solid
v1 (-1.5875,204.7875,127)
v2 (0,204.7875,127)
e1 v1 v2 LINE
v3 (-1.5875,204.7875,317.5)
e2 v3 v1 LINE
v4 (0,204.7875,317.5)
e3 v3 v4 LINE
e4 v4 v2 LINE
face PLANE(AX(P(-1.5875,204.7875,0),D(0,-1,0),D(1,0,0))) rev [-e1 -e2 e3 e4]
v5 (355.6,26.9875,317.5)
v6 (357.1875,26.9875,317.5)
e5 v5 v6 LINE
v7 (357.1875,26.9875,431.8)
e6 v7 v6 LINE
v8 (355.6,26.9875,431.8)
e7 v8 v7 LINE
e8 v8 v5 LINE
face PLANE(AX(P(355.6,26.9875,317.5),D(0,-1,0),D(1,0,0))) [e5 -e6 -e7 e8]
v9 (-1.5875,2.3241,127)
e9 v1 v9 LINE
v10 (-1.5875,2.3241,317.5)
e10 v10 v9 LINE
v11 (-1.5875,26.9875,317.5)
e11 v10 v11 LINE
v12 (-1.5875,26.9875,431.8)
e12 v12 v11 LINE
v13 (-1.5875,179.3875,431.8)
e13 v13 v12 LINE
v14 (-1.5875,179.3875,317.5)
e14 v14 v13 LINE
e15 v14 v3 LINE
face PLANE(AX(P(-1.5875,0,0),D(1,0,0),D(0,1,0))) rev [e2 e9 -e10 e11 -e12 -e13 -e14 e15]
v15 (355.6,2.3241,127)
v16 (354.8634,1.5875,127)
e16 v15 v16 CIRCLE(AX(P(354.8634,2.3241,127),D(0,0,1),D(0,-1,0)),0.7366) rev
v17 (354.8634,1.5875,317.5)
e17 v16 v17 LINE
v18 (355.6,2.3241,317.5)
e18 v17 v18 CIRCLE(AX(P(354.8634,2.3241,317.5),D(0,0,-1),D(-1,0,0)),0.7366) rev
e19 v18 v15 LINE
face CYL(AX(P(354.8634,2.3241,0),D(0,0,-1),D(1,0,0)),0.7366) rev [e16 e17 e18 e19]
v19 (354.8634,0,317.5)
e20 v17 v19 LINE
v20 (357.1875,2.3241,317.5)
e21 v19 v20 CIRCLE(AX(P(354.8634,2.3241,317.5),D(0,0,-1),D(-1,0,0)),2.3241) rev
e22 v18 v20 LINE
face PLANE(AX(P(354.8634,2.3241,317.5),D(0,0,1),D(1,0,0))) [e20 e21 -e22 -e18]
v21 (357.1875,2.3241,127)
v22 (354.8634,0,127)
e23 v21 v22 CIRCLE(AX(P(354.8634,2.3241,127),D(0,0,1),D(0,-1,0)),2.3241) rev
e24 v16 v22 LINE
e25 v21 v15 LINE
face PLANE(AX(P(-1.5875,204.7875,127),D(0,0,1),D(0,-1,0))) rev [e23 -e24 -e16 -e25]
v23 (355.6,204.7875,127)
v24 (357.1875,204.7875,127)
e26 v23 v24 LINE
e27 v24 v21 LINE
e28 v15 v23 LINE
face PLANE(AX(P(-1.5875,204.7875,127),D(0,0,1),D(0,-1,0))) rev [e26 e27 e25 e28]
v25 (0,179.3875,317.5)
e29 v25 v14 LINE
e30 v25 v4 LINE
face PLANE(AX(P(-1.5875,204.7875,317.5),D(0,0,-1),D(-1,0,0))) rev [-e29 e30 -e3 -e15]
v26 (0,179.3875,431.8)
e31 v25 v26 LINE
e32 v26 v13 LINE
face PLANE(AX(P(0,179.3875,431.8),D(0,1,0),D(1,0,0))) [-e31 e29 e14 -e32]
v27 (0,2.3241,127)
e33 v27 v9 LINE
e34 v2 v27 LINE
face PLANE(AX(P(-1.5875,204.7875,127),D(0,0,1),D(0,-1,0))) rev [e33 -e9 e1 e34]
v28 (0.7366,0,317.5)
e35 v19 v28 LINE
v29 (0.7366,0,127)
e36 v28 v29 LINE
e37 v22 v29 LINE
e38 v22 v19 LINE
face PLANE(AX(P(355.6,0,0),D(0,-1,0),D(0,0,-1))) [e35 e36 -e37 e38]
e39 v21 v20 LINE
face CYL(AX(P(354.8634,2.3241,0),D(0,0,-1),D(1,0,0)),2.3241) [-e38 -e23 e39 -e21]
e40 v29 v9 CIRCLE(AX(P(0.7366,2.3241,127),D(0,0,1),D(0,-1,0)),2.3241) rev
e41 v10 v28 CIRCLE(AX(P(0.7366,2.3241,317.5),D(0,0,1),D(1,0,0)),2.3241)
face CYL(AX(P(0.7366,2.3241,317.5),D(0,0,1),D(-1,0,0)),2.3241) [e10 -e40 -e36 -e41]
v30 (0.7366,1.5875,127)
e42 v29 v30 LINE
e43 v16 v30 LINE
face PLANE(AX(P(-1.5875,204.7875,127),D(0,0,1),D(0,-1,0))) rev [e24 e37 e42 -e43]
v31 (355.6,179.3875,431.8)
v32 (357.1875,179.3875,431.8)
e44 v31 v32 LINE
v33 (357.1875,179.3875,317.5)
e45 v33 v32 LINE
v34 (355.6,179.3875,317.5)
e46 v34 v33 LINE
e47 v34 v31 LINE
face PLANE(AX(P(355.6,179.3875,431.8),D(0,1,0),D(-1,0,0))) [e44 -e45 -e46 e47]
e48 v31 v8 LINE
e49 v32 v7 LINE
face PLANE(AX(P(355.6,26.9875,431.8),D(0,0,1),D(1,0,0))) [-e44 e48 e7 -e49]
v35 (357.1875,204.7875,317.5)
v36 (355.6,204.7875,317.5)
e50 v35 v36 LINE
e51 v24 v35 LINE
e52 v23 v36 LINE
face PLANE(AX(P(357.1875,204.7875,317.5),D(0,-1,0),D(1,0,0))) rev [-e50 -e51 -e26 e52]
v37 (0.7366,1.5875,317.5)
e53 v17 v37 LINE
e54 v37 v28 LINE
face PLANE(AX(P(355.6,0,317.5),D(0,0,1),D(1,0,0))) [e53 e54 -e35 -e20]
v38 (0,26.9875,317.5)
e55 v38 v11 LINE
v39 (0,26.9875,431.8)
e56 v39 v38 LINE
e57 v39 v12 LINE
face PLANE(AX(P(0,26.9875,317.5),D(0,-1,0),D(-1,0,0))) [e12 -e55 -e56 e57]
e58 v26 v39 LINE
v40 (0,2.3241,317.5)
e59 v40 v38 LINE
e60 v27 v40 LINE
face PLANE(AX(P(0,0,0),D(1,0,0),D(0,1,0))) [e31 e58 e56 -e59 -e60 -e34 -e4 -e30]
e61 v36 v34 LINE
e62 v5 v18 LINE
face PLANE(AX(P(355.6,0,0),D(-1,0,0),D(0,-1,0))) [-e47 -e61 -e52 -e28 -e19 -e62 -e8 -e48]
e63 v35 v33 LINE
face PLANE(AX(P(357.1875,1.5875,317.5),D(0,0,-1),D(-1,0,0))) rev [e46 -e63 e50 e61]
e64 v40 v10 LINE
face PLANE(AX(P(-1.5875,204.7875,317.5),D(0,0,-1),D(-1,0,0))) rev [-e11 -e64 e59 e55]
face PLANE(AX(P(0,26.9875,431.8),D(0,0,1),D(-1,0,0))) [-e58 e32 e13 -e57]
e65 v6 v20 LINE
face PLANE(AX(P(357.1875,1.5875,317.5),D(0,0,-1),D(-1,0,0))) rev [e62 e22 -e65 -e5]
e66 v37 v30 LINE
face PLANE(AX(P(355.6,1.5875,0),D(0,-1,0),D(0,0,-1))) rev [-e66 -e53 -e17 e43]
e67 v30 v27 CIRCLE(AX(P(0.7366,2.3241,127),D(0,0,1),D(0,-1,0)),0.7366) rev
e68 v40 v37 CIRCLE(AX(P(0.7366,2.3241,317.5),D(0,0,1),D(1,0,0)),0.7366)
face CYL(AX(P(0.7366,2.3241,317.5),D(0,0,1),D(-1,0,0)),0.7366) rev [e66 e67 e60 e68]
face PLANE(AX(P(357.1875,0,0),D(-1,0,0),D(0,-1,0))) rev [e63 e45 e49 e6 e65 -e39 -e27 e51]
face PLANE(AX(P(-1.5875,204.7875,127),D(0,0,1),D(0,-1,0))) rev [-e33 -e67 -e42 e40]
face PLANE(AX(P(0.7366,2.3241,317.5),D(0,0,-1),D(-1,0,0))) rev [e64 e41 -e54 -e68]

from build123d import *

# Parameters (mm, degrees)
SKETCH1_W                      = 317.5
SKETCH1_H                      = 1.5875
BASE_FLANGE1_DEPTH             = 355.6
EDGE_FLANGE1_STRIP_W           = 7.8232
EDGE_FLANGE1_STRIP_H           = 1.5875
EDGE_FLANGE1_STRIP_CUT_DEPTH   = 317.5
EDGE_FLANGE1_STRIP_2_W         = 7.8232
EDGE_FLANGE1_STRIP_2_H         = 1.5875
EDGE_FLANGE1_STRIP_CUT_2_DEPTH = 317.5
EDGE_FLANGE1_DEPTH             = 317.5
EDGE_FLANGE1_BEND_DEPTH        = 317.5
SKETCH8_W                      = 114.3
SKETCH8_H                      = 152.4
BOSS_EXTRUDE1_DEPTH            = 1.5875
SKETCH10_W                     = 127
SKETCH10_H                     = 254
CUT_EXTRUDE1_DEPTH             = 598.585693253


# Sheet-metal steps are written as plain solids
with BuildPart() as part:
    # Sketch1 → Base-Flange1 (new body)
    with BuildSketch(Plane(origin=(0, 0, 0), x_dir=(0, 0, -1), z_dir=(1, 0, 0))):
        with Locations((-158.75, 0.79375)):
            Rectangle(SKETCH1_W, SKETCH1_H)
    extrude(amount=BASE_FLANGE1_DEPTH)

    # Edge-Flange1 strip (across the edge) → Edge-Flange1 strip cut (cut)
    with BuildSketch(Plane(origin=(355.6, 1.5875, 317.5), x_dir=(-1, 0, 0), z_dir=(0, 0, -1))):
        with Locations((-3.175, -0.79375)):
            Rectangle(EDGE_FLANGE1_STRIP_W, EDGE_FLANGE1_STRIP_H)
    extrude(amount=EDGE_FLANGE1_STRIP_CUT_DEPTH, mode=Mode.SUBTRACT)

    # Edge-Flange1 strip 2 (across the edge) → Edge-Flange1 strip cut 2 (cut)
    with BuildSketch(Plane(origin=(0, 1.5875, 0), x_dir=(1, 0, 0), z_dir=(0, 0, 1))):
        with Locations((-3.175, -0.79375)):
            Rectangle(EDGE_FLANGE1_STRIP_2_W, EDGE_FLANGE1_STRIP_2_H)
    extrude(amount=EDGE_FLANGE1_STRIP_CUT_2_DEPTH, mode=Mode.SUBTRACT)

    # Edge-Flange1 section (across the edge) → Edge-Flange1 (add)
    with BuildSketch(Plane(origin=(355.6, 1.5875, 317.5), x_dir=(-1, 0, 0), z_dir=(0, 0, -1))):
        with BuildLine():
            Line((-1.5875, 0.7366), (-1.5875, 203.2))
            Line((-1.5875, 203.2), (0, 203.2))
            Line((0, 203.2), (0, 0.7366))
            ThreePointArc((0, 0.7366), (0.215745145, 0.215745145), (0.7366, 0))
            Line((0.7366, 0), (0.7366, -1.5875))
            ThreePointArc((0.7366, -1.5875), (-0.90678687, -0.90678687), (-1.5875, 0.7366))
        make_face()
    extrude(amount=EDGE_FLANGE1_DEPTH)

    # Edge-Flange1 section 2 (across the edge) → Edge-Flange1 bend (add)
    with BuildSketch(Plane(origin=(0, 1.5875, 0), x_dir=(1, 0, 0), z_dir=(0, 0, 1))):
        with BuildLine():
            Line((-1.5875, 0.7366), (-1.5875, 203.2))
            Line((-1.5875, 203.2), (0, 203.2))
            Line((0, 203.2), (0, 0.7366))
            ThreePointArc((0, 0.7366), (0.215745145, 0.215745145), (0.7366, 0))
            Line((0.7366, 0), (0.7366, -1.5875))
            ThreePointArc((0.7366, -1.5875), (-0.90678687, -0.90678687), (-1.5875, 0.7366))
        make_face()
    extrude(amount=EDGE_FLANGE1_BEND_DEPTH)


with BuildPart() as body_2:
    # Sketch8 → Boss-Extrude1 (new body)
    with BuildSketch(Plane(origin=(357.1875, 0, 0), x_dir=(0, 0, -1), z_dir=(1, 0, 0))):
        with Locations((-374.65, 103.1875)):
            Rectangle(SKETCH8_W, SKETCH8_H)
    extrude(amount=-BOSS_EXTRUDE1_DEPTH)


with BuildPart() as body_3:
    # Mirror1: mirrored copy
    add(body_2.part.mirror(Plane(origin=(177.8, 0, 0), x_dir=(0, 0, 1), z_dir=(1, 0, 0))))


with BuildPart() as body_2_1:
    add(body_2.part)

    # Combine1: union part, body 3
    add(part.part)
    add(body_3.part)

    # Sketch10 → Cut-Extrude1 (cut, through all)
    with BuildSketch(Plane(origin=(357.1875, 0, 0), x_dir=(0, 0, -1), z_dir=(1, 0, 0))):
        with Locations((-63.5, 77.7875)):
            Rectangle(SKETCH10_W, SKETCH10_H)
    extrude(amount=-CUT_EXTRUDE1_DEPTH, mode=Mode.SUBTRACT)


solid = body_2_1.part
